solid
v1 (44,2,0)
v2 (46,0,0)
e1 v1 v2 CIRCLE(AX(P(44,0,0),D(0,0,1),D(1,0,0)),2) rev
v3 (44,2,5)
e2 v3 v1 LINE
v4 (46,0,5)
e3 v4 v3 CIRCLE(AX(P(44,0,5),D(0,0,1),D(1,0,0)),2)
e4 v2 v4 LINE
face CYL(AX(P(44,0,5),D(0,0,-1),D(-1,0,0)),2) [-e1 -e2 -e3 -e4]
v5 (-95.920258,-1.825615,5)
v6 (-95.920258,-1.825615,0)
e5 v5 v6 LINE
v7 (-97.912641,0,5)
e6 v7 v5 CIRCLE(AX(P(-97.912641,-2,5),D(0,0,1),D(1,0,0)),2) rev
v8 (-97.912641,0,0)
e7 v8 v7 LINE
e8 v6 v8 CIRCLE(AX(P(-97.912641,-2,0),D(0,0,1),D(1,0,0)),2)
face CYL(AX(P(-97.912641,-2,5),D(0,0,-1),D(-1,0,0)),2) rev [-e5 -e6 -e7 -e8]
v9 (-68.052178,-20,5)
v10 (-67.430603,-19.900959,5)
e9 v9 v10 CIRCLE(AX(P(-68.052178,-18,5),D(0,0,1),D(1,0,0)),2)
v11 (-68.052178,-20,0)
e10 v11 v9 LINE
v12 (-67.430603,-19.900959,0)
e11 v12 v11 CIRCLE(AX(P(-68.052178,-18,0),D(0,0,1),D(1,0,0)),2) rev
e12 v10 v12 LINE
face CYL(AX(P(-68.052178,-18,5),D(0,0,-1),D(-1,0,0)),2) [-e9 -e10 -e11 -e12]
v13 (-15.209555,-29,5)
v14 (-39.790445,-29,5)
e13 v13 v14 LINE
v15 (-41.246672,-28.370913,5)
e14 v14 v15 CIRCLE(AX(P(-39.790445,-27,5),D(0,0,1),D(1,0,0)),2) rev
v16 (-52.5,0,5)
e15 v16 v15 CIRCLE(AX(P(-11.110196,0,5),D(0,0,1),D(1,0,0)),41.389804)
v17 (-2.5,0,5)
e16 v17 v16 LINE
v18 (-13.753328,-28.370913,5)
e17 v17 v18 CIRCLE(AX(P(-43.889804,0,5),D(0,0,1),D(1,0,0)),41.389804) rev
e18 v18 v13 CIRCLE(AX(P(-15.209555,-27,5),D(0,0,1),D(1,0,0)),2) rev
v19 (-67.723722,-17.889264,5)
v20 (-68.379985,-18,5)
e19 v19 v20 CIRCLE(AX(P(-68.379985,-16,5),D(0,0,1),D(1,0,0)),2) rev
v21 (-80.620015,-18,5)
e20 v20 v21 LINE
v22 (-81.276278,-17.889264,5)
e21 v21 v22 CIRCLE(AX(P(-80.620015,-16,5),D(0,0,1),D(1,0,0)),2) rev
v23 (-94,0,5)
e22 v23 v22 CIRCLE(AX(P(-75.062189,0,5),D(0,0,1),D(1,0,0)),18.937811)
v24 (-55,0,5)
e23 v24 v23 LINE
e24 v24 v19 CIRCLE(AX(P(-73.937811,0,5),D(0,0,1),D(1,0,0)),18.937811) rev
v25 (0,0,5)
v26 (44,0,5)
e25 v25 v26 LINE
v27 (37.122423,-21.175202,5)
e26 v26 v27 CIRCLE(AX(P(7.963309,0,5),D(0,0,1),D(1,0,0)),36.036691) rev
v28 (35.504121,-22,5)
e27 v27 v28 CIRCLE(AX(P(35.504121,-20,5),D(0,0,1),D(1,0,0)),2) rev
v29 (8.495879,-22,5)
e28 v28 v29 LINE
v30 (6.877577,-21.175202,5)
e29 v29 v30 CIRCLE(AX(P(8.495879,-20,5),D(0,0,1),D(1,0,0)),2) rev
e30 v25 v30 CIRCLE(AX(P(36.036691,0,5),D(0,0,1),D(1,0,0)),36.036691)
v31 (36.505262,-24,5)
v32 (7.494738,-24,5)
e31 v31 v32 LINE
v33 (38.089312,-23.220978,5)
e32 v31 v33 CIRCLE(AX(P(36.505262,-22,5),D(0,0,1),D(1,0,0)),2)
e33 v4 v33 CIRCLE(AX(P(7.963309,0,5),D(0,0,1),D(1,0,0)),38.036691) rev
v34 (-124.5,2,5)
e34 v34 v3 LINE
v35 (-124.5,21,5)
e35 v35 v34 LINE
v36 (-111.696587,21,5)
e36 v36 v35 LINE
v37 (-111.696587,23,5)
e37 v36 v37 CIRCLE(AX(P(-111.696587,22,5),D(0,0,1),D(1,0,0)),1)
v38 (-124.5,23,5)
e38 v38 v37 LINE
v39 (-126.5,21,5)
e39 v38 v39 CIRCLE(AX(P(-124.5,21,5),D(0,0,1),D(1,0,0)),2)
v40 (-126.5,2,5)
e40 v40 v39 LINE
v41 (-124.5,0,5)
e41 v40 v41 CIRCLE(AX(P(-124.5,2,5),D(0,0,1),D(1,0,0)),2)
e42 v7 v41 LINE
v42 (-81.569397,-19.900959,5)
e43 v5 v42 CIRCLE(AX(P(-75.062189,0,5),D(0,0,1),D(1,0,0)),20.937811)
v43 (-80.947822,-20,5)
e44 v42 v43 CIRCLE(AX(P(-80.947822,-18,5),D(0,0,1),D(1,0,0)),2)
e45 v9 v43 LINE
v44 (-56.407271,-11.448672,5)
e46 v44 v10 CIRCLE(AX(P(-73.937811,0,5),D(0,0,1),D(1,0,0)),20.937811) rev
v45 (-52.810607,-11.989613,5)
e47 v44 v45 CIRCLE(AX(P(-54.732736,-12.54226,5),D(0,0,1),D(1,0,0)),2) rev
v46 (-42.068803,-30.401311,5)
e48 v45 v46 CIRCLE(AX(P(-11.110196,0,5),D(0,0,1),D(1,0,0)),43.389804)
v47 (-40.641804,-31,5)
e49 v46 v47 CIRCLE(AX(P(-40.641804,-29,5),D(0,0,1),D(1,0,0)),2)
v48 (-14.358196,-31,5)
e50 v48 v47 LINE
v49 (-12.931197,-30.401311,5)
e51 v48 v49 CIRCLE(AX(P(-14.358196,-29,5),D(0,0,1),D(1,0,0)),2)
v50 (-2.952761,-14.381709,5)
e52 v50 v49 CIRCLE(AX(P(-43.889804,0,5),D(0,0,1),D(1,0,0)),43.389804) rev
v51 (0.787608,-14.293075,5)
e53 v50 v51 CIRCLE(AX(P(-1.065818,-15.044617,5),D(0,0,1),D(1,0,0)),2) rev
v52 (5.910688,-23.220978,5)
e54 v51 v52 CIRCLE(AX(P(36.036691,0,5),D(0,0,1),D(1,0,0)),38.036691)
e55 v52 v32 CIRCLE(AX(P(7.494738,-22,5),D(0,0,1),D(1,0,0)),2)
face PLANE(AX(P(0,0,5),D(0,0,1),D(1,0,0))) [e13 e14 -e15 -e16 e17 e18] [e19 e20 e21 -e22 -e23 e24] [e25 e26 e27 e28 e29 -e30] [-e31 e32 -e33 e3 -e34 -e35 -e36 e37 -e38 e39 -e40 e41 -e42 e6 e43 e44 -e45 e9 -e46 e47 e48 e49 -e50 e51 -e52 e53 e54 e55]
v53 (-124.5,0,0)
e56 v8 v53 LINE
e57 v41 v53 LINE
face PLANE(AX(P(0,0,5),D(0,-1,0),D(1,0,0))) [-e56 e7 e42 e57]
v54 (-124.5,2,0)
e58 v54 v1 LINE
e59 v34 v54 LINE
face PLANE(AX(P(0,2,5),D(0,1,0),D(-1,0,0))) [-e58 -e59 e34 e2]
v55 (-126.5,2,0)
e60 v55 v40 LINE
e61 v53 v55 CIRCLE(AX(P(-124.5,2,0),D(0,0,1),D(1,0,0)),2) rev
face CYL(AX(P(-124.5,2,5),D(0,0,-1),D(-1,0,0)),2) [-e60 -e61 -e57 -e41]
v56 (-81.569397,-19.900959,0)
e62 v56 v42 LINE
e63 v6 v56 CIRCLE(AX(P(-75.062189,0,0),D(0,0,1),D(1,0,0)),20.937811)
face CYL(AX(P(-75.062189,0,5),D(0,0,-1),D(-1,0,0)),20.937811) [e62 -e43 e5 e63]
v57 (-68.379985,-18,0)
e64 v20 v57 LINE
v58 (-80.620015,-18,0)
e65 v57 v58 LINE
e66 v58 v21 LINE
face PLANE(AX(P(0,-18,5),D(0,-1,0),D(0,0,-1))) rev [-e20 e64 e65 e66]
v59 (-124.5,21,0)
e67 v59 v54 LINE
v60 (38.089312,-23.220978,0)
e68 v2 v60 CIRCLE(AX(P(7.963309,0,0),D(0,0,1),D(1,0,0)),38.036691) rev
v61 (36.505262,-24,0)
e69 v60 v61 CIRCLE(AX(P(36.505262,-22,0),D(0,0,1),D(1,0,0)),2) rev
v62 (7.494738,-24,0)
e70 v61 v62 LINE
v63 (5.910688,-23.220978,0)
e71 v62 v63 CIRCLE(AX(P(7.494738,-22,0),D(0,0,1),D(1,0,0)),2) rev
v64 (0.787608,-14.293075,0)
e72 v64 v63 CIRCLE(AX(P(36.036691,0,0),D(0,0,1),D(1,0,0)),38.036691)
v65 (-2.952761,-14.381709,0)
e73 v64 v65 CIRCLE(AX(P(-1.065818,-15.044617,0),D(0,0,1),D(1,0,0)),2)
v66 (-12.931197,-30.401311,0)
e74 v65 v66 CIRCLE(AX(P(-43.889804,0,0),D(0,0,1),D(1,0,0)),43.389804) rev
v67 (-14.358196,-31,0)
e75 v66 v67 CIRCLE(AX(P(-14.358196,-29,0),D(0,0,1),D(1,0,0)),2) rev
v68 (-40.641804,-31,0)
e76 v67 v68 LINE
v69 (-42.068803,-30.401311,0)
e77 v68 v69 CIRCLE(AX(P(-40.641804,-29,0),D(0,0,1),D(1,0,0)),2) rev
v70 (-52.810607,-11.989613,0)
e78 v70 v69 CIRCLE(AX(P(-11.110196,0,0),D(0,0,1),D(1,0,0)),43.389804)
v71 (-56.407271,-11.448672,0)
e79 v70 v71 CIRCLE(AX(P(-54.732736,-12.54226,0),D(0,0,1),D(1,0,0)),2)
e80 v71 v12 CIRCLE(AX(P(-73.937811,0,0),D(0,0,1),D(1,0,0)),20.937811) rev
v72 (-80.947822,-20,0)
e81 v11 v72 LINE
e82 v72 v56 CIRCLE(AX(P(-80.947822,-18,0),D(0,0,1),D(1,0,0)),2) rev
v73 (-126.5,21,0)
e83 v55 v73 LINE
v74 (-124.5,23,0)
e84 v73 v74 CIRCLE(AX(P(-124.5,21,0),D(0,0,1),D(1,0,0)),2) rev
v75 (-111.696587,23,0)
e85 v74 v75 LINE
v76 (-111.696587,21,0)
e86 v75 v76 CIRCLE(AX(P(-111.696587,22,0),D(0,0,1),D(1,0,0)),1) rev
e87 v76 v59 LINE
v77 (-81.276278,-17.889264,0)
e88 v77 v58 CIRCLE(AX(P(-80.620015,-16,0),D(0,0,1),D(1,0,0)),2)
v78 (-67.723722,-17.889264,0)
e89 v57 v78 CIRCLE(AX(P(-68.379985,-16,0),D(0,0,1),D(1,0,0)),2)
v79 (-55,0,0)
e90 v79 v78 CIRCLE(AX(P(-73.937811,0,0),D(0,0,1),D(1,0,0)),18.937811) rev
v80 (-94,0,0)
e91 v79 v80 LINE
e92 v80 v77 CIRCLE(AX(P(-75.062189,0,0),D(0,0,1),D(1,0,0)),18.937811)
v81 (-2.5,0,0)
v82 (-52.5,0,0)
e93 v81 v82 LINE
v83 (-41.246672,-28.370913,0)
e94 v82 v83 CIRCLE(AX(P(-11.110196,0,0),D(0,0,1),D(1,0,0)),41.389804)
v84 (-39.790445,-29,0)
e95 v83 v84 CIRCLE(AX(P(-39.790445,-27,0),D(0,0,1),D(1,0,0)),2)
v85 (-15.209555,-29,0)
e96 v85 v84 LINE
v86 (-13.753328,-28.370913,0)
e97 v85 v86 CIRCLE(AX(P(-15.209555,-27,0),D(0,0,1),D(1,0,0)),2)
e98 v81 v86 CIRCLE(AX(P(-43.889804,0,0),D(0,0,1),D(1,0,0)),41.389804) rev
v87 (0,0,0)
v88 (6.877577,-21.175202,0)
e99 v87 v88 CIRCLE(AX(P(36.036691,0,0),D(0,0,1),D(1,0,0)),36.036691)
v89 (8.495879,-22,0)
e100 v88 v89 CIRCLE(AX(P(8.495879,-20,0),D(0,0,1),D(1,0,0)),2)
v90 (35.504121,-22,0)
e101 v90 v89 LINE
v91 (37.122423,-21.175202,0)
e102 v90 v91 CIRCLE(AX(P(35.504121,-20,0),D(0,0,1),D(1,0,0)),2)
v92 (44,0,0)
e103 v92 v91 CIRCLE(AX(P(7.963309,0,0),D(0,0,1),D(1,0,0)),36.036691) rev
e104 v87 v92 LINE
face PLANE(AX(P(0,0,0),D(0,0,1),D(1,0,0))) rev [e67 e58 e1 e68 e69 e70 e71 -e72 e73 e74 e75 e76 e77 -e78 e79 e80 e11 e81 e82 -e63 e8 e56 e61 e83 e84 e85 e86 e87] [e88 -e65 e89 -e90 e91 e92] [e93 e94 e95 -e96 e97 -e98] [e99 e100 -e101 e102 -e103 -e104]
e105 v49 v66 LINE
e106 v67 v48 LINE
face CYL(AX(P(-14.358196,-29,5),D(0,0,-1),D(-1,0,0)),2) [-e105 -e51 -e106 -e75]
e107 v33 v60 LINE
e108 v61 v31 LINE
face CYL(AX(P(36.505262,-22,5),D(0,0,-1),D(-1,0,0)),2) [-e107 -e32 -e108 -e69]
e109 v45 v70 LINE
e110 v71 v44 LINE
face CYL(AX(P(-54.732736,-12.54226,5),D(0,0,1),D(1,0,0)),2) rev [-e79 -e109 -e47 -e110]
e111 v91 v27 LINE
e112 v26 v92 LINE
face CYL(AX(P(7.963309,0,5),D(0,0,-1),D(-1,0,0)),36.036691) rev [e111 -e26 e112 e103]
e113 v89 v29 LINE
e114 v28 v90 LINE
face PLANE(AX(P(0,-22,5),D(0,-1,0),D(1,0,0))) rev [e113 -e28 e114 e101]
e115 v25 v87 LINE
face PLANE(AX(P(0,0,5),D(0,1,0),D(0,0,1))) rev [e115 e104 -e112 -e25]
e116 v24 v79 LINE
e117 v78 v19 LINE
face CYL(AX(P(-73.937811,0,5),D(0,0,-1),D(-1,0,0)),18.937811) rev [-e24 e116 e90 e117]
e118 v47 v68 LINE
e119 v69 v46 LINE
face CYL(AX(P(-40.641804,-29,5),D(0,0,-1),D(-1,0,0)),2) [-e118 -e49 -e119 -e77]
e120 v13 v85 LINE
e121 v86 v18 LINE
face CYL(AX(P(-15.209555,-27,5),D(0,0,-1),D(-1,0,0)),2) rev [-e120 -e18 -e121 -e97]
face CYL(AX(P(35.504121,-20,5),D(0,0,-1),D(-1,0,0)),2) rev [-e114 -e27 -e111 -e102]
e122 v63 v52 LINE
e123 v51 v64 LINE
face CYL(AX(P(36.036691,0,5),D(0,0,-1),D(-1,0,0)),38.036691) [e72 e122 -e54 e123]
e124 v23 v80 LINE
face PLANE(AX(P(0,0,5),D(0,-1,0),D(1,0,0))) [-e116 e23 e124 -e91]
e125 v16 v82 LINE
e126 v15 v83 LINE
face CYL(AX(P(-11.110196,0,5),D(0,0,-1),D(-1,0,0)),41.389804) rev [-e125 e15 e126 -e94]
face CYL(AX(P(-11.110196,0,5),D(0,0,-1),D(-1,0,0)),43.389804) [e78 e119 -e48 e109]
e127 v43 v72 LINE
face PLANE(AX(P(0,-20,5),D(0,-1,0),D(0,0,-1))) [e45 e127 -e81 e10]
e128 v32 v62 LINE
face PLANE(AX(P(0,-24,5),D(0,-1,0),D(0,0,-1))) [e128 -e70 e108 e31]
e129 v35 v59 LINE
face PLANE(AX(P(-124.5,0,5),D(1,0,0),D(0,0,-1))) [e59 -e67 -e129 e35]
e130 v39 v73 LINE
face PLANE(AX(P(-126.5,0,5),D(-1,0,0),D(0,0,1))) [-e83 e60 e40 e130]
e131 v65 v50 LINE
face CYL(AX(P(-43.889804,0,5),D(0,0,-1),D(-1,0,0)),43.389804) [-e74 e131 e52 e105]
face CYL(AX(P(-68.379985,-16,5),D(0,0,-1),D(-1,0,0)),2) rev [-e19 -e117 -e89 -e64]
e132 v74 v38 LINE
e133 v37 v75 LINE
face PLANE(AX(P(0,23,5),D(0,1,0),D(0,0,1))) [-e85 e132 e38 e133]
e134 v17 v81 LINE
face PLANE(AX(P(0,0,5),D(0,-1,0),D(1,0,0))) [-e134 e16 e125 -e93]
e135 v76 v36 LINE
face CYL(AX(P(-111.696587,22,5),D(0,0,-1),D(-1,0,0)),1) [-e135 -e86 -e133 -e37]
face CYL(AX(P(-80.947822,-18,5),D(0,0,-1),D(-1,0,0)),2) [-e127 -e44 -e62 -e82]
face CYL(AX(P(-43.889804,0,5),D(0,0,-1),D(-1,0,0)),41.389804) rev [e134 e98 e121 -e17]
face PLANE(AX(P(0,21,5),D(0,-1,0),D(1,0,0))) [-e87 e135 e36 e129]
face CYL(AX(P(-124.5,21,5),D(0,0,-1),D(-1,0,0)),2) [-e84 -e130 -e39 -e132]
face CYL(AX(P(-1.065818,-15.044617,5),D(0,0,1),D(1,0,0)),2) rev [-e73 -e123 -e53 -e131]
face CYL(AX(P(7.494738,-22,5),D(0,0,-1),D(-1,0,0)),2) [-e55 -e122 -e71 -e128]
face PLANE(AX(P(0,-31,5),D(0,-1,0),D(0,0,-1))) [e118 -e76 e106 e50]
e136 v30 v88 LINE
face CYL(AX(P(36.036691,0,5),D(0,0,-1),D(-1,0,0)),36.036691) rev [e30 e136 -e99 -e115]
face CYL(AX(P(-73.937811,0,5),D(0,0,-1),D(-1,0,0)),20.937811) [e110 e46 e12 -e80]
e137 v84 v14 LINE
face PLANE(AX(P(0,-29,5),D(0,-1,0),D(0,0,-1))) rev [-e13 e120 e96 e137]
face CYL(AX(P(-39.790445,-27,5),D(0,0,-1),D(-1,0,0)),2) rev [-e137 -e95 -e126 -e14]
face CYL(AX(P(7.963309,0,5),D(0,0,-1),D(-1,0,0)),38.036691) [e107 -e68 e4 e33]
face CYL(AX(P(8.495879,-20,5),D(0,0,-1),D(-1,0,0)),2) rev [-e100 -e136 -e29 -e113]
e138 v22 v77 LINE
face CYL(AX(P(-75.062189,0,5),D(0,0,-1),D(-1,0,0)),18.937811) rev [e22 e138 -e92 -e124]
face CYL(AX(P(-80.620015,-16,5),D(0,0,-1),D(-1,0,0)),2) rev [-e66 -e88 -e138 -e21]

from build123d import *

# Parameters (mm, degrees)
BOSS_EXTRUDE1_DEPTH = 5
FILLET1_R           = 2
FILLET2_R           = 1


with BuildPart() as part:
    # Sketch1 → Boss-Extrude1 (new body)
    with BuildSketch(Plane.XY):
        with BuildLine():
            Line((45.947382797642085, 2), (-124.5, 1.9999999999999962))
            Line((-124.5, 1.9999999999999962), (-124.5, 20.99999999999999))
            Line((-124.5, 20.99999999999999), (-109.6965869966638, 20.999999999999993))
            Line((-109.6965869966638, 20.999999999999993), (-109.6965869966638, 22.99999999999999))
            Line((-109.6965869966638, 22.99999999999999), (-126.5, 22.99999999999999))
            Line((-126.5, 22.99999999999999), (-126.5, -3.98e-15))
            Line((-126.5, -3.98e-15), (-96.00000000000003, -5.01e-15))
            ThreePointArc((-96.00000000000003, -1.3922e-13), (-91.91634498174992, -12.422936572760829), (-81.25831039658792, -19.999999999999993))
            Line((-81.25831039658792, -19.999999999999996), (-67.7416896034121, -19.999999999999996))
            ThreePointArc((-67.7416896034121, -20), (-59.22674645064795, -14.898875979359843), (-54.01801901082011, -6.449326782725662))
            ThreePointArc((-54.01801901082044, -6.449326782725638), (-49.745600463821845, -19.747926884371328), (-41.46929842095424, -31.000000000000007))
            Line((-41.46929842095423, -31), (-13.530701579045768, -31))
            ThreePointArc((-13.530701579045765, -31.000000000000004), (-5.5615533236631265, -20.33765705801185), (-1.1997684126617827, -7.76118245981885))
            ThreePointArc((-1.1997684126617756, -7.761182459818851), (1.6903832669508674, -16.34383705889386), (6.527542114603506, -24))
            Line((6.527542114603509, -24), (37.47245788539651, -24))
            ThreePointArc((37.47245788539651, -24), (44.12729350691807, -11.787963694678155), (45.947382797642085, 2))
        make_face()
        with BuildLine():
            ThreePointArc((-55.000000000000014, -3.1e-16), (-58.606442943263986, -11.117096597214955), (-68.05217786452643, -18))
            Line((-68.05217786452643, -18), (-80.94782213547359, -18))
            ThreePointArc((-80.94782213547359, -18.000000000000004), (-90.39355705673603, -11.117096597214955), (-94, -5.08e-15))
            Line((-94, -5.08e-15), (-55.00000000000001, -3.1e-16))
        make_face(mode=Mode.SUBTRACT)
        with BuildLine():
            ThreePointArc((-2.499999999999993, 0), (-5.579078670022007, -15.665382277262486), (-14.358195797467605, -28.999999999999996))
            Line((-14.358195797467618, -29), (-40.641804202532384, -29))
            ThreePointArc((-40.641804202532384, -29), (-49.420921329978, -15.665382277262491), (-52.500000000000014, 0))
            Line((-52.50000000000001, 0), (-2.5, 0))
        make_face(mode=Mode.SUBTRACT)
        with BuildLine():
            ThreePointArc((7.494737611193308, -21.999999999999993), (1.9251046025075595, -11.620790548201041), (0, 0))
            Line((0, 0), (44, 0))
            ThreePointArc((44, 0), (42.07489539749246, -11.620790548201052), (36.5052623888067, -22))
            Line((36.50526238880669, -22), (7.494737611193305, -21.999999999999986))
        make_face(mode=Mode.SUBTRACT)
    extrude(amount=BOSS_EXTRUDE1_DEPTH)

    # Fillet1
    # the kernel refuses this fillet: 2 mm, written as the material it adds along each edge
    with BuildSketch(Plane(origin=(7.494737611193306, -21.99999999999999, 0), x_dir=(-0.5991062369957058, 0.8006695428157894, 0), z_dir=(0, 0, 1))) as fillet1_piece_1:
        with BuildLine():
            CenterArc((1.0015491764552975, -1.9997957036664622), FILLET1_R, 89.18105145509278, 54.01303517716653)
            Line((-0.5997899091731567, -0.8015832296708748), (0, 0))
            ThreePointArc((0, 0), (0.5150674500576004, 0.00368108195627573), (1.030134900115199, -5e-17))
        make_face()
    extrude(amount=5)
    with BuildSketch(Plane(origin=(36.5052623888067, -22, 0), x_dir=(0.599106236995708, 0.8006695428157878, 0), z_dir=(0, 0, 1))) as fillet1_piece_2:
        with BuildLine():
            CenterArc((1.0015491764552726, 1.9997957036664615), FILLET1_R, 216.80591336773654, 54.01303517717065)
            Line((-0.5997899091732678, 0.8015832296709893), (0, 0))
            ThreePointArc((0, 0), (0.5150674500575887, -0.00368108195627645), (1.0301349001151745, 4e-17))
        make_face()
    extrude(amount=5)
    with BuildSketch(Plane(origin=(-1.1997684126617827, -7.7611824598188495, 0), x_dir=(-0.2559607440844839, -0.9666871766438806, 0), z_dir=(0, 0, 1))) as fillet1_piece_3:
        with BuildLine():
            CenterArc((7.006516264382127, 1.9937618524445377), FILLET1_R, 126.90247774602503, 138.57101311365483)
            ThreePointArc((5.80560665040515, 3.593079237786693), (2.9835854859434217, 1.6660138445939616), (0, 0))
            ThreePointArc((0, 0), (3.424337799359584, 0.13533600091225512), (6.84867559871917, -3e-17))
        make_face()
    extrude(amount=5)
    with BuildSketch(Plane(origin=(-14.358195797467612, -29, 0), x_dir=(0.6930946226970236, 0.720846616131664, 0), z_dir=(0, 0, 1))) as fillet1_piece_4:
        with BuildLine():
            CenterArc((0.8516205484031373, 1.9998888522074818), FILLET1_R, 223.8755770631898, 46.728475963226686)
            Line((-0.5900726838592292, 0.6136996068124346), (0, 0))
            ThreePointArc((0, 0), (0.4363527930685471, -0.00230019269212628), (0.8727055861370968, 1e-17))
        make_face()
    extrude(amount=5)
    with BuildSketch(Plane(origin=(-40.641804202532384, -29, 0), x_dir=(1, 0, 0), z_dir=(0, 0, 1))) as fillet1_piece_5:
        with BuildLine():
            CenterArc((0.8513594890752856, 2), FILLET1_R, 223.27152403673355, 46.72847596326642)
            ThreePointArc((-0.6048675489506863, 0.629086868644805), (-0.3040918605932177, 0.3129491831369968), (0, 0))
            Line((0, 0), (0.8513594890752856, 0))
        make_face()
    extrude(amount=5)
    with BuildSketch(Plane(origin=(-54.01801901082027, -6.449326782725651, 0), x_dir=(-0.4311999989802577, -0.9022563720359229, 0), z_dir=(0, 0, 1))) as fillet1_piece_6:
        with BuildLine():
            CenterArc((5.805573723556372, 1.9824143967569778), FILLET1_R, 131.58462794743895, 130.81175906112728)
            ThreePointArc((4.4781226039186794, 3.478366777340206), (2.2959426874147386, 1.6659530957609738), (0, 0))
            ThreePointArc((0, 0), (2.7704679671233965, 0.18410201579468238), (5.540935934246784, 1.2e-16))
        make_face()
    extrude(amount=5)
    with BuildSketch(Plane(origin=(-68.05217786452643, -18, 0), x_dir=(0.9475954690279733, 0.3194727329173106, 0), z_dir=(0, 0, 1))) as fillet1_piece_7:
        with BuildLine():
            CenterArc((0.3283173010527549, 1.9999162475023402), FILLET1_R, 251.36895898872925, 19.155393135414442)
            Line((-0.31062816478187977, 0.10472530944639823), (0, 0))
            ThreePointArc((0, 0), (0.17331019378626858, -0.00079304447276945), (0.34662038757253955, 0))
        make_face()
    extrude(amount=5)
    with BuildSketch(Plane(origin=(-80.94782213547359, -18.000000000000004, 0), x_dir=(1, 1.084e-14, 0), z_dir=(0, 0, 1))) as fillet1_piece_8:
        with BuildLine():
            CenterArc((0.32780672231424324, 2), FILLET1_R, 250.84460686458493, 19.155393135414442)
            ThreePointArc((-0.32845590873647146, 0.11073576250266372), (-0.1644813104532966, 0.05461639590219925), (0, 0))
            Line((0, 0), (0.3278067223142216, 0))
        make_face()
    extrude(amount=5)
    with BuildSketch(Plane(origin=(-96.00000000000003, -7.212e-14, 0), x_dir=(-1, 3.515e-14, 0), z_dir=(0, 0, 1))) as fillet1_piece_9:
        with BuildLine():
            CenterArc((1.912641367901373, 2), FILLET1_R, 185.00210139930942, 84.99789860069257)
            ThreePointArc((-0.07974163383531896, 1.82561544107731), (-0.01994490800398211, 0.9136780706116656), (0, 0))
            Line((0, 0), (1.9126413679014433, 0))
        make_face()
    extrude(amount=5)
    # the kernel refuses this fillet: 2 mm, written as the material it takes off along each edge
    with BuildSketch(Plane(origin=(45.947382797642085, 2.000000000000002, -5.001730056930275), x_dir=(0.026299501252087354, -0.9996541082964104, 0), z_dir=(0, 0, 1))) as fillet1_2_piece_1:
        with BuildLine():
            CenterArc((1.9480930202679383, -1.9993082165928209), FILLET1_R, 88.4929758152285, 89.9999999999682)
            Line((-0.05121519632485345, -1.9467092140875382), (0, 0))
            ThreePointArc((0, 0), (1.0003460113860576, 0.01315657596471321), (2.0006920227721112, 0))
        make_face()
    extrude(amount=15.003460113860552, mode=Mode.SUBTRACT)
    with BuildSketch(Plane(origin=(37.47245788539651, -24, -2.4841807127470568), x_dir=(-1, 0, 0), z_dir=(0, 0, 1))) as fillet1_2_piece_2:
        with BuildLine():
            CenterArc((0.9671954965845302, -2), FILLET1_R, 90, 52.37513808750745)
            ThreePointArc((-0.6168541298615224, -0.7790222029225369), (-0.3109710749573793, -0.3874966748050994), (0, 0))
            Line((0, 0), (0.9671954965845302, 0))
        make_face()
    extrude(amount=9.968361425494114, mode=Mode.SUBTRACT)
    with BuildSketch(Plane(origin=(6.527542114603495, -24, -2.484180712746931), x_dir=(-0.6207822630344314, 0.7839830239883068, 0), z_dir=(0, 0, 1))) as fillet1_2_piece_3:
        with BuildLine():
            CenterArc((0.9675482388101264, -1.9998293762732642), FILLET1_R, 89.2515799187701, 52.375138087411486)
            Line((-0.60041780916442, -0.7582648502017908), (0, 0))
            ThreePointArc((0, 0), (0.4968361425493905, 0.00324498101414436), (0.993672285098762, -4e-17))
        make_face()
    extrude(amount=9.96836142549386, mode=Mode.SUBTRACT)
    with BuildSketch(Plane(origin=(-13.53070157904575, -31, -2.118127681372563), x_dir=(-1, 0, 0), z_dir=(0, 0, 1))) as fillet1_2_piece_4:
        with BuildLine():
            CenterArc((0.8274942184199716, -2), FILLET1_R, 90, 45.520369910435846)
            ThreePointArc((-0.5995049670605166, -0.598688712441799), (-0.30121380534773223, -0.29788104203134225), (0, 0))
            Line((0, 0), (0.8274942184199716, 0))
        make_face()
    extrude(amount=9.236255362745126, mode=Mode.SUBTRACT)
    with BuildSketch(Plane(origin=(-41.469298420954246, -31, -2.118127681372557), x_dir=(1, 0, 0), z_dir=(0, 0, 1))) as fillet1_2_piece_5:
        with BuildLine():
            CenterArc((0.8274942184200782, 2), FILLET1_R, 224.47963008956205, 45.52036991043792)
            ThreePointArc((-0.5995049670604615, 0.5986887124418523), (-0.3012138053477287, 0.29788104203132804), (0, 0))
            Line((0, 0), (0.8274942184200782, 0))
        make_face()
    extrude(amount=9.236255362745114, mode=Mode.SUBTRACT)
    with BuildSketch(Plane(origin=(-67.7416896034121, -19.999999999999996, -0.8161799892839701), x_dir=(-1, 0, 0), z_dir=(0, 0, 1))) as fillet1_2_piece_6:
        with BuildLine():
            CenterArc((0.3104882611143438, -2), FILLET1_R, 90, 18.10668888712732)
            ThreePointArc((-0.3110865262256084, -0.09904108836006387), (-0.15573630283404327, -0.04891420940217017), (0, 0))
            Line((0, 0), (0.3104882611143438, 0))
        make_face()
    extrude(amount=6.632359978548406, mode=Mode.SUBTRACT)
    with BuildSketch(Plane(origin=(-81.25831039658793, -19.999999999999993, -0.8161799892839283), x_dir=(-0.9528735398862427, 0.3033677916072522, 0), z_dir=(0, 0, 1))) as fillet1_2_piece_7:
        with BuildLine():
            CenterArc((0.3108795347533545, -1.9999392178667164), FILLET1_R, 89.55330437229577, 18.106688887126865)
            Line((-0.2958560484611499, -0.09419213809423096), (0, 0))
            ThreePointArc((0, 0), (0.16323599785482176, 0.00063632240005913), (0.32647199570966445, 0))
        make_face()
    extrude(amount=6.632359978548333, mode=Mode.SUBTRACT)
    with BuildSketch(Plane(origin=(-109.6965869966638, 20.999999999999993, -5), x_dir=(-1, 0, 0), z_dir=(0, 0, 1)), Plane(origin=(-126.5, 22.99999999999999, -5), x_dir=(1, 0, 0), z_dir=(0, 0, 1))) as fillet1_2_piece_8:
        with BuildLine():
            CenterArc((FILLET1_R, -FILLET1_R), FILLET1_R, 90, 90)
            Line((0, -FILLET1_R), (0, 0))
            Line((0, 0), (FILLET1_R, 0))
        make_face()
    extrude(amount=15, mode=Mode.SUBTRACT)
    with BuildSketch(Plane(origin=(-109.6965869966638, 22.99999999999999, -5), x_dir=(0, -1, 0), z_dir=(0, 0, 1))) as fillet1_2_piece_9:
        with BuildLine():
            CenterArc((FILLET1_R, -FILLET1_R), FILLET1_R, 90, 90)
            Line((0, -FILLET1_R), (0, 0))
            Line((0, 0), (FILLET1_R, 0))
        make_face()
    extrude(amount=15, mode=Mode.SUBTRACT)
    with BuildSketch(Plane(origin=(-126.5, -3.55e-15, -5.000000000000001), x_dir=(0, 1, 0), z_dir=(0, 0, 1))) as fillet1_2_piece_10:
        with BuildLine():
            CenterArc((FILLET1_R, -FILLET1_R), FILLET1_R, 90, 90)
            Line((0, -FILLET1_R), (0, 0))
            Line((0, 0), (FILLET1_R, 0))
        make_face()
    extrude(amount=15, mode=Mode.SUBTRACT)

    # Fillet2
    # the kernel refuses this fillet: 1 mm, written as the material it takes off along each edge
    with BuildSketch(Plane(origin=(-109.96453618909511, 22, 9.999988187015607), x_dir=(-0.8660247217603869, -0.5000011812984491, 0), z_dir=(0, 0, -1))) as fillet2_piece_1:
        with BuildLine():
            CenterArc((1.4999964561018568, 0.8660260858068783), FILLET2_R, 120.0002344623185, 179.99968738357467)
            ThreePointArc((0.9999929122093405, 1.7320494435143525), (0.2679464643438091, 0.9999980028954786), (0, 0))
            ThreePointArc((0, 0), (0.9999976374012411, -0.26794782838624004), (1.999995274802482, 1.4e-16))
        make_face()
    extrude(amount=14.999976374031213, mode=Mode.SUBTRACT)


solid = part.part
